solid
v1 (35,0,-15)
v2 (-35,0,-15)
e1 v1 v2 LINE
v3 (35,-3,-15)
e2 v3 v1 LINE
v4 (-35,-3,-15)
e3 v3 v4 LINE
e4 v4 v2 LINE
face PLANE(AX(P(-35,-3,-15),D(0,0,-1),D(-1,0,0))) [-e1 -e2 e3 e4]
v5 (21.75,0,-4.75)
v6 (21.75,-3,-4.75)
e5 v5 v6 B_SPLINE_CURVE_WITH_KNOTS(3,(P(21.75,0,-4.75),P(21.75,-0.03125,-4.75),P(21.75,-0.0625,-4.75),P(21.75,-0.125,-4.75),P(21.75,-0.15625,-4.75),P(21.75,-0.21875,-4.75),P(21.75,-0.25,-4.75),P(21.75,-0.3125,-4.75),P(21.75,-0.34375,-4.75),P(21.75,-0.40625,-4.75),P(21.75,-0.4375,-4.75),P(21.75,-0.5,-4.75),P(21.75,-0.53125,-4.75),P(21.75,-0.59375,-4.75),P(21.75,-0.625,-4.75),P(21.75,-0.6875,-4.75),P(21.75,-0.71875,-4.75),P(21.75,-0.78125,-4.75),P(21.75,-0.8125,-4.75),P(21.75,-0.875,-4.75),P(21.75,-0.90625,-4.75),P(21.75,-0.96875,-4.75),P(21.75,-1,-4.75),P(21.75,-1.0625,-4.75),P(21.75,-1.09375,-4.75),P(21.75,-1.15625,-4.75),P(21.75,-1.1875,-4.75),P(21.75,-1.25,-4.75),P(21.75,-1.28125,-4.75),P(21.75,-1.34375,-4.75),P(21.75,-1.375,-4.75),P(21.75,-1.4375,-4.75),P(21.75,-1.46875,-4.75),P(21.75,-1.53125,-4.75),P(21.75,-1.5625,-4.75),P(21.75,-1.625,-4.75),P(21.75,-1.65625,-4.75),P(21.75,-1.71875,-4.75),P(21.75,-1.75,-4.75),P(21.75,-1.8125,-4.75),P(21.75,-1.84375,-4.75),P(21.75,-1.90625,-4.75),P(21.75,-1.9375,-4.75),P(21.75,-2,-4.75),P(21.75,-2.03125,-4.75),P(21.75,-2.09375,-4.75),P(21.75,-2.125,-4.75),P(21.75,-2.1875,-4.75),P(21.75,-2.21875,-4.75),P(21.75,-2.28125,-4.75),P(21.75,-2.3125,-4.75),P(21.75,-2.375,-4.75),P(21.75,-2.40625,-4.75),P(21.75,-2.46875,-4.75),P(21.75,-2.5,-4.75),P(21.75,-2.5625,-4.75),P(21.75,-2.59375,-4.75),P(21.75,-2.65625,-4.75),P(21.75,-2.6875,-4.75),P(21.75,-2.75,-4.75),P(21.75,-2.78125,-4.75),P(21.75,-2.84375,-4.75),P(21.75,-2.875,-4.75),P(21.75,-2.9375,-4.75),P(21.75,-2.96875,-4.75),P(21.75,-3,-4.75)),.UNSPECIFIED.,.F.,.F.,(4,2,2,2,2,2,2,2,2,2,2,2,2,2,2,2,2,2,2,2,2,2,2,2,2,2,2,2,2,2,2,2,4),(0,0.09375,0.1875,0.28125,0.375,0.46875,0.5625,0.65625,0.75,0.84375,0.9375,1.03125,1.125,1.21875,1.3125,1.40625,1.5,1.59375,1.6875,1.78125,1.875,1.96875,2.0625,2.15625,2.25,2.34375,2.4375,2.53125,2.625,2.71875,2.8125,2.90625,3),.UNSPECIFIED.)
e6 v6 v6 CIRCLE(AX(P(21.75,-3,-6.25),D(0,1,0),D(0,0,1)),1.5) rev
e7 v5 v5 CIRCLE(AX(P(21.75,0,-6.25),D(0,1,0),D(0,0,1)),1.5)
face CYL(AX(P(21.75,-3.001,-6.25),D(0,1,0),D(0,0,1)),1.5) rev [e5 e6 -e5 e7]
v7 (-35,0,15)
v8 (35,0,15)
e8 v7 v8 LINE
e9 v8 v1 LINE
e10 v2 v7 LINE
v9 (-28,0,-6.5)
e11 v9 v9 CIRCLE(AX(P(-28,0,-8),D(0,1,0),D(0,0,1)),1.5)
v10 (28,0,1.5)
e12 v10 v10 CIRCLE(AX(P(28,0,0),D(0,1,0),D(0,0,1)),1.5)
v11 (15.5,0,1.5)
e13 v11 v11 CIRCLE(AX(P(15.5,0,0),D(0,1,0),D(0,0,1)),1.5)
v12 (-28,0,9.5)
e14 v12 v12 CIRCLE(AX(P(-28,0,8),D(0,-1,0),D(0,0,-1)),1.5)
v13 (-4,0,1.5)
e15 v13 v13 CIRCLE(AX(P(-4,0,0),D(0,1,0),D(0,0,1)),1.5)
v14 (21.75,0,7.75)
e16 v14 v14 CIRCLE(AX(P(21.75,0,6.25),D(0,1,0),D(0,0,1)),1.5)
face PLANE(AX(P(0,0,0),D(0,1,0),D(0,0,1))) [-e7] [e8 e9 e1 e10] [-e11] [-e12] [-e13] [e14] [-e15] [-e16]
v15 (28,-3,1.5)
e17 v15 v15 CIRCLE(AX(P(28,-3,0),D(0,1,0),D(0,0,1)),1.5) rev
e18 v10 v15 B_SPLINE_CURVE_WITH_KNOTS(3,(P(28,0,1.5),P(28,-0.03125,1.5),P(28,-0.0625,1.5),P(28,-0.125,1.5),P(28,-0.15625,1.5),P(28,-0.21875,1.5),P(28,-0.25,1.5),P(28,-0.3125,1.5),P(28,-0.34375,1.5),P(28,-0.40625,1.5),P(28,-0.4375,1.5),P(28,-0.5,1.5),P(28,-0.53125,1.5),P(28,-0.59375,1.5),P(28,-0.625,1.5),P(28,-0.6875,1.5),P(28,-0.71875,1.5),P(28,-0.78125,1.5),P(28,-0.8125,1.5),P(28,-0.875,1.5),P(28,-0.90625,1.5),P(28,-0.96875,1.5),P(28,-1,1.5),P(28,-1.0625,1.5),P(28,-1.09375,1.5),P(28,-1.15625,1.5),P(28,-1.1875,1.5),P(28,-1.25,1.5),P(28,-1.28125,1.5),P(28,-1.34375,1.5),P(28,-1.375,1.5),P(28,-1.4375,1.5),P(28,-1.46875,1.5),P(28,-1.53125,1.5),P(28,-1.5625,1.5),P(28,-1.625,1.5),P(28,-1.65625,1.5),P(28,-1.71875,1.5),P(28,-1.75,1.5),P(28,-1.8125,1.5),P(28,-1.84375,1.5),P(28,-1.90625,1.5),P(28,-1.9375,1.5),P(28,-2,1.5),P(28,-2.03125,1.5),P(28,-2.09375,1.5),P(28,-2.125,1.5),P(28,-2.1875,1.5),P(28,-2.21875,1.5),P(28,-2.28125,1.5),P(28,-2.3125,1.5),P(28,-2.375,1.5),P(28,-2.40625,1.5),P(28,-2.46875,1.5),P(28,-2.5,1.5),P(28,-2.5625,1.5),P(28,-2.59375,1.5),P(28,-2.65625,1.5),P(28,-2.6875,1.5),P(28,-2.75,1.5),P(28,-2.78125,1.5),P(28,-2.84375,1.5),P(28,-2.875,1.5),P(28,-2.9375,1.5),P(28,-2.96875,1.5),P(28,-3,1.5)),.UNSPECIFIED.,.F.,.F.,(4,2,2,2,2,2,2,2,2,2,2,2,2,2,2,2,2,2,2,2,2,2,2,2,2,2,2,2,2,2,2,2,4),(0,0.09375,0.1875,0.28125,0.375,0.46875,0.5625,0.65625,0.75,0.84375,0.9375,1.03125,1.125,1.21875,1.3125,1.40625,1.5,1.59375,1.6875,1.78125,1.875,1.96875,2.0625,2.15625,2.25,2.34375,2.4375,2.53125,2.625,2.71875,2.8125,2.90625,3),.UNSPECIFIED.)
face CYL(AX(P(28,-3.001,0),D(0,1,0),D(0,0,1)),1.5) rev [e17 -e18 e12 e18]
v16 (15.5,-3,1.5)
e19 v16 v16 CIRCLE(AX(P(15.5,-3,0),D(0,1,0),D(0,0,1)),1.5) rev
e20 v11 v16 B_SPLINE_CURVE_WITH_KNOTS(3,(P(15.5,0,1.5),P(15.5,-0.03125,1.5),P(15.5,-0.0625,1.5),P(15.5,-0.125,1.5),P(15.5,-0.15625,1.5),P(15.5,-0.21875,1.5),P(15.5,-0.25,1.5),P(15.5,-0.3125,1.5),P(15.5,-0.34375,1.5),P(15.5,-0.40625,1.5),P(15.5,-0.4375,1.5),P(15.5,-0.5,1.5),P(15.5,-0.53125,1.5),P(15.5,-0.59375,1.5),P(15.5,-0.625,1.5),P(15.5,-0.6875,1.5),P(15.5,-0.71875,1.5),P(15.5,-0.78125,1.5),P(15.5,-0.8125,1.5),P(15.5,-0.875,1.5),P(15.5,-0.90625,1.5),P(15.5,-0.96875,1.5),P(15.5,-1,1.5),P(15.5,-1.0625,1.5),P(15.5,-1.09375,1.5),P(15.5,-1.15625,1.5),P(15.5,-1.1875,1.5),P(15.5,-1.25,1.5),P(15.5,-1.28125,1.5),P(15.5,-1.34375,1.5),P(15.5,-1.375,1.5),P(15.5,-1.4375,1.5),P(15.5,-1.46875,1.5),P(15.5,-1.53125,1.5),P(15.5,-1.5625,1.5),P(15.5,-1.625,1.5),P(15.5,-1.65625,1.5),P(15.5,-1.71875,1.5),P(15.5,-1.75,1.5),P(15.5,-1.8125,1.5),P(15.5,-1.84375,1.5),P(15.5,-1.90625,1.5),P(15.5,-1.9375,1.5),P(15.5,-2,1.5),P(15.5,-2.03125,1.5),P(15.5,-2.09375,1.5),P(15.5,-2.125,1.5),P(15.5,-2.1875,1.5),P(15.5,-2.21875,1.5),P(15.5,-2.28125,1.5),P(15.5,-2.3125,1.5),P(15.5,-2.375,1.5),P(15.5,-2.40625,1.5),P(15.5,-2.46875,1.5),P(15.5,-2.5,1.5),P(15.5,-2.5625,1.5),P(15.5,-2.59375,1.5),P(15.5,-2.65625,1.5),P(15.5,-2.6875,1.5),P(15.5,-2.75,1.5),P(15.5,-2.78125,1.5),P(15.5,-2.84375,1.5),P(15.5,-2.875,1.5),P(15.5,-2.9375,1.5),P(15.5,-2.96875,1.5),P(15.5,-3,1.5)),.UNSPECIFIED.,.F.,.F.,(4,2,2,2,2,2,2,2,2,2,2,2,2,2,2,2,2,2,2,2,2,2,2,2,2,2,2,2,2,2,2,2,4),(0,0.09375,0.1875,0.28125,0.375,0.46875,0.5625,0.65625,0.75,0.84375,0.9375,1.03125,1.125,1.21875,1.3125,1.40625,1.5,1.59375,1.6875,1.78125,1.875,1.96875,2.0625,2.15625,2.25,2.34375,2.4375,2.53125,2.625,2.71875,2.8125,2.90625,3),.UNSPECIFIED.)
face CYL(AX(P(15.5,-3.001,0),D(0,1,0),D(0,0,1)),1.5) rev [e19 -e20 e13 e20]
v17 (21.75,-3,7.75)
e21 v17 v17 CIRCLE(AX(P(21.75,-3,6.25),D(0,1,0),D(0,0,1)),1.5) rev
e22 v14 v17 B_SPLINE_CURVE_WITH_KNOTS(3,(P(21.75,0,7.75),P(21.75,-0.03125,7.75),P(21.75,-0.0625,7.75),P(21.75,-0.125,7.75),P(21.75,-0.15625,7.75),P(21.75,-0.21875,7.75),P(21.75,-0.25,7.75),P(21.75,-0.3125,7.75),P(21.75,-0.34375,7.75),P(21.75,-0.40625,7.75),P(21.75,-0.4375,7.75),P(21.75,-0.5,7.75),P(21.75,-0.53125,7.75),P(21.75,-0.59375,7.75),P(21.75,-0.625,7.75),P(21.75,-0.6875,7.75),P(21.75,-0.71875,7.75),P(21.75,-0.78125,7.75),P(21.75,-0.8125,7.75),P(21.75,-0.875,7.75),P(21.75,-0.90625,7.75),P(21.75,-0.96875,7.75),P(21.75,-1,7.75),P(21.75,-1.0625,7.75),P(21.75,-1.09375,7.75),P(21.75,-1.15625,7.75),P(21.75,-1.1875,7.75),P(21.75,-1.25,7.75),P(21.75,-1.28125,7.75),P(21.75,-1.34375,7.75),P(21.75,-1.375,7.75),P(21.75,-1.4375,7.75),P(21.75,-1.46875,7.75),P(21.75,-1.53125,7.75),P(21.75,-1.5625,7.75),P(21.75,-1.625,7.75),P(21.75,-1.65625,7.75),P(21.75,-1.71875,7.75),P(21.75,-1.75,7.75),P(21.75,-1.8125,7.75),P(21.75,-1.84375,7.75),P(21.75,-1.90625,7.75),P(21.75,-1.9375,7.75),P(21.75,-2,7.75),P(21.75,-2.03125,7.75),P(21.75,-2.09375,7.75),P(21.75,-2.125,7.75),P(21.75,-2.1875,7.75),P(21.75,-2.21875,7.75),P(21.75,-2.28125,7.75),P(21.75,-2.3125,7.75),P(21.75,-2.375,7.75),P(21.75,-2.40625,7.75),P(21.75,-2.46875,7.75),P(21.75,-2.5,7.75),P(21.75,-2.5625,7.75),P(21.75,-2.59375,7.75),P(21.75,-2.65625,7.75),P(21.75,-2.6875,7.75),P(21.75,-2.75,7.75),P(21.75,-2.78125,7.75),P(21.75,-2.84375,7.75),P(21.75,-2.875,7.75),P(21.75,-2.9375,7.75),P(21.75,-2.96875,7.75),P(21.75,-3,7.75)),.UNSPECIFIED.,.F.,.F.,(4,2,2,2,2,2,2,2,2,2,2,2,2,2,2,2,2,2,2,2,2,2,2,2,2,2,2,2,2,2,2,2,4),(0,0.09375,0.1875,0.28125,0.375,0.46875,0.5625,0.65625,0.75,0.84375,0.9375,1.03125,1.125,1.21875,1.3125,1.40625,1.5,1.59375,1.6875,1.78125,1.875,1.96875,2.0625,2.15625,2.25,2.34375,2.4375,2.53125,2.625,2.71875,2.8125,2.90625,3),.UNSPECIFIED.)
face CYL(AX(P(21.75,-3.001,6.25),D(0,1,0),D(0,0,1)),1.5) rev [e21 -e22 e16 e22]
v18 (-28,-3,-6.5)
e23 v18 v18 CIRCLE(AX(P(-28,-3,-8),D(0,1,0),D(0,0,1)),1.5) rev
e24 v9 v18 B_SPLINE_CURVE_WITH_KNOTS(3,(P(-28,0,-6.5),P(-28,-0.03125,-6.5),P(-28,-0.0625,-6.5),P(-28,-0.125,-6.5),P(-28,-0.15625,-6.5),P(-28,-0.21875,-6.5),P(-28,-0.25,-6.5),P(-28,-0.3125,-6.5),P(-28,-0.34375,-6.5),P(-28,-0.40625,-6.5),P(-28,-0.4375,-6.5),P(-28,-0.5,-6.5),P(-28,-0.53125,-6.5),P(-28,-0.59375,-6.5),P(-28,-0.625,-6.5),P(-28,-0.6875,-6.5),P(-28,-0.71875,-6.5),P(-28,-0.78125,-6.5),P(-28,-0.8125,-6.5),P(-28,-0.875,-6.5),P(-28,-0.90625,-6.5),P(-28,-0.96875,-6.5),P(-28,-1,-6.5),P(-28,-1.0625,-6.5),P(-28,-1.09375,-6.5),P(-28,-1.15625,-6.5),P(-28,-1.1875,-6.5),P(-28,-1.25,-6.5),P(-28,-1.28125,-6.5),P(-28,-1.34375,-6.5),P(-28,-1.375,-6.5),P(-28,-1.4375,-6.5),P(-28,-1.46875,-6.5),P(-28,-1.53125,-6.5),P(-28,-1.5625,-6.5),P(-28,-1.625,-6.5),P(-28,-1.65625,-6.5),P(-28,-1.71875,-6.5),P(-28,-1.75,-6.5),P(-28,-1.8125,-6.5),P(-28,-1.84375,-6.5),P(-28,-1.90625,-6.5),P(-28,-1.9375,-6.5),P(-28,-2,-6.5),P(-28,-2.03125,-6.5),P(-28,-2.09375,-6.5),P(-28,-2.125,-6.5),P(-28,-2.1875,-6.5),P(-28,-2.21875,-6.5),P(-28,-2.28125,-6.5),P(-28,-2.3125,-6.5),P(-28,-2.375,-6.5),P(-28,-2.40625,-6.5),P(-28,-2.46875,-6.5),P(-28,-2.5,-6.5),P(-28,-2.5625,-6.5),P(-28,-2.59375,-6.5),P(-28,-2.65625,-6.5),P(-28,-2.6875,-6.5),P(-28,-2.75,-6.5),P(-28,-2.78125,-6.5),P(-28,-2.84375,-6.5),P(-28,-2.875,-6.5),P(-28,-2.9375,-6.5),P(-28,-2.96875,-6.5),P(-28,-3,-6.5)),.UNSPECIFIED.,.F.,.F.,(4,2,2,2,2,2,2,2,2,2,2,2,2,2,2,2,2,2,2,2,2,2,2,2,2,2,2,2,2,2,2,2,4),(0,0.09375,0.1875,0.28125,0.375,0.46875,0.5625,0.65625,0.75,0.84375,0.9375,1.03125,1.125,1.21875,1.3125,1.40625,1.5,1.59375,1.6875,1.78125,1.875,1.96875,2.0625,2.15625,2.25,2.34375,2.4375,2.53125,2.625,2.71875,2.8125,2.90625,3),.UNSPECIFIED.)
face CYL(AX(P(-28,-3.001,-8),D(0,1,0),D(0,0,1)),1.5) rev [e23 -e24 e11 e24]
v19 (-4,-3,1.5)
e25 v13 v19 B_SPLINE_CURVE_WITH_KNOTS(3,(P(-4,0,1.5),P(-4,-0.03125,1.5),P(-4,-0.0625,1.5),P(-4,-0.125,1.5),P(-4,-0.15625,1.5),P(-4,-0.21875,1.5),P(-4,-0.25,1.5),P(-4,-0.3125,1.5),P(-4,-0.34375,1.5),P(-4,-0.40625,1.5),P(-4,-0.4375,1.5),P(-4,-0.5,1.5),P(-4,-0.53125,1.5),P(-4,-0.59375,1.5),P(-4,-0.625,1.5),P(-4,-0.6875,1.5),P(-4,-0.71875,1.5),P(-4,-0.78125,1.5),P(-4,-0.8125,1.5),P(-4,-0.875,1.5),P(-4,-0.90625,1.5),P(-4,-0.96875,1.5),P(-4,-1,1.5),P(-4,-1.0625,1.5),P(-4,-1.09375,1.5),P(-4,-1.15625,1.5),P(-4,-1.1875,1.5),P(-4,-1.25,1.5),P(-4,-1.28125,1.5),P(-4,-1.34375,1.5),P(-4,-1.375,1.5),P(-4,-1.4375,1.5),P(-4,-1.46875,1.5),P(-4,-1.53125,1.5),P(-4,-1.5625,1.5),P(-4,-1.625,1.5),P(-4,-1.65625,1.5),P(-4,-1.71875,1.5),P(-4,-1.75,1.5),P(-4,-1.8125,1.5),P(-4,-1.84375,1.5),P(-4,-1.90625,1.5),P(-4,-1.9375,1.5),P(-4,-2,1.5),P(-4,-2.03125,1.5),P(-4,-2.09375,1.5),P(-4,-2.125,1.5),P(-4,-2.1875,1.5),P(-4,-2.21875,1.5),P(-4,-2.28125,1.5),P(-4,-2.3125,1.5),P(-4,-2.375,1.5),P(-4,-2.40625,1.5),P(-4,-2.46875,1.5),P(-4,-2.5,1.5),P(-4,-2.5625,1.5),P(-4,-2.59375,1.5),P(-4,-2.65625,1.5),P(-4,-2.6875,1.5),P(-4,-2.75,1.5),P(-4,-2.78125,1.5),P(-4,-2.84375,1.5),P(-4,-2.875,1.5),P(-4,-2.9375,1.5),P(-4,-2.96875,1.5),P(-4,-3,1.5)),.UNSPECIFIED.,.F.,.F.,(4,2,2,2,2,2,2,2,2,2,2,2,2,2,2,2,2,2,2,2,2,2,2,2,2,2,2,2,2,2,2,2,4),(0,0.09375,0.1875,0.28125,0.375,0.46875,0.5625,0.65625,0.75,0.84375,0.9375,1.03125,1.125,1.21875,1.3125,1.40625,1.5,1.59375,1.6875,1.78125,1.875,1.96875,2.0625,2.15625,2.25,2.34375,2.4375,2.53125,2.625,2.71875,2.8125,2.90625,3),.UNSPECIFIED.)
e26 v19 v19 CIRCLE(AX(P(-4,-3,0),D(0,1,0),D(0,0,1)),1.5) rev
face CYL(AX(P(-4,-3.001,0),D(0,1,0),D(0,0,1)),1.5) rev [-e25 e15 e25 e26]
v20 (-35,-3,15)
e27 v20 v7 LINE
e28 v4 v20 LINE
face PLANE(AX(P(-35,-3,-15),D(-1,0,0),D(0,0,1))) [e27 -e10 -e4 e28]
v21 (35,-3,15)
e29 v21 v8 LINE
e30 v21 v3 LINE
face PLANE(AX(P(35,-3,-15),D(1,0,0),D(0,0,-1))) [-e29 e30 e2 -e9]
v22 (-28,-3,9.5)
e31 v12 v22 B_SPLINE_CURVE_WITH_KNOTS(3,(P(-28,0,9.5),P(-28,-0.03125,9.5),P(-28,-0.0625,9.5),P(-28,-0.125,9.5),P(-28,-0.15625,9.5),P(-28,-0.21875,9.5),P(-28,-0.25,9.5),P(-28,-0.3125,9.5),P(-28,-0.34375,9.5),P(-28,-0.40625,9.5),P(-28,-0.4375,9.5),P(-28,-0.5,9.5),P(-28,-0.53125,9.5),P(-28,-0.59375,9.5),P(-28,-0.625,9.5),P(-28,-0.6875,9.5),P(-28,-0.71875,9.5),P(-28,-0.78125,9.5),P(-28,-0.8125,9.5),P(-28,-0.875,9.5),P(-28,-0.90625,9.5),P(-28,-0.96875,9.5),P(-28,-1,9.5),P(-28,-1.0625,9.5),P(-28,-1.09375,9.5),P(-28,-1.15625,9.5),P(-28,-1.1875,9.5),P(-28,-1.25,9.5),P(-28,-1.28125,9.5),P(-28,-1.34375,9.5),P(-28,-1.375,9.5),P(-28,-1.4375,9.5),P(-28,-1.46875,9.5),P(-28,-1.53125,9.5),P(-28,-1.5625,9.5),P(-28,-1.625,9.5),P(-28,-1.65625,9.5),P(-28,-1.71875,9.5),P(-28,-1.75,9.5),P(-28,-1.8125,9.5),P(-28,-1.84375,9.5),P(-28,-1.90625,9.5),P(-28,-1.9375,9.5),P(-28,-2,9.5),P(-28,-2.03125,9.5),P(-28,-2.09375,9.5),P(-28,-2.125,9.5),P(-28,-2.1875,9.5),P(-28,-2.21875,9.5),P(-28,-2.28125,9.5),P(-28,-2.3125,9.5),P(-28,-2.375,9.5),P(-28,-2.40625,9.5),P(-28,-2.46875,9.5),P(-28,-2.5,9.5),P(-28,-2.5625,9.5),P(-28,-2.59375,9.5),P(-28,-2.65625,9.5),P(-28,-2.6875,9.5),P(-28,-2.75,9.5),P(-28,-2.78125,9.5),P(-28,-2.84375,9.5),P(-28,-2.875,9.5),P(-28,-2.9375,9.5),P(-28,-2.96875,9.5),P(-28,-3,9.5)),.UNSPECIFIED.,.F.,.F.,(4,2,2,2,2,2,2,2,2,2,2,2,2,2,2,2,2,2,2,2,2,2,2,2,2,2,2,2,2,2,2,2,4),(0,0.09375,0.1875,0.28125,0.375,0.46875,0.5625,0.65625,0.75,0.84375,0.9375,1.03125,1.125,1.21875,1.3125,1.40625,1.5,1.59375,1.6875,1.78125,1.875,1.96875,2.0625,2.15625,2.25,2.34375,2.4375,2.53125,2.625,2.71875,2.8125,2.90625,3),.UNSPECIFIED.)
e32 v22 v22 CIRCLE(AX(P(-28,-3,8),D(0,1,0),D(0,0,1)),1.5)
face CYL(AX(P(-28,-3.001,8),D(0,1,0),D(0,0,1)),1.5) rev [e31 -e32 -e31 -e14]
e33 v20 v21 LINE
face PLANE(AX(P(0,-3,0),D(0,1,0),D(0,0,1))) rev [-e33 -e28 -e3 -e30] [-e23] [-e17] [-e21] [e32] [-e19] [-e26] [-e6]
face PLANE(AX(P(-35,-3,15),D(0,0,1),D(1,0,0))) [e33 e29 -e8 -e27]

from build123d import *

# Parameters (mm, degrees)
SZKIC1_W                   = 70
SZKIC1_H                   = 30
ODGI_CIE_BAZOWE1_DEPTH     = 3
WYTNIJ_WYCI_GNI_CIE1_REACH = 40.197
SZKIC6_R                   = 1.5
WYTNIJ_WYCI_GNI_CIE2_REACH = 40.197
SZKIC7_R                   = 1.5
WYTNIJ_WYCI_GNI_CIE3_REACH = 40.197
SZKIC10_R                  = 1.5


# Sheet-metal steps are written as plain solids
with BuildPart() as part:
    # Szkic1 → Odgięcie bazowe1 (new body)
    with BuildSketch(Plane(origin=(0, 0, 0), x_dir=(1, 0, 0), z_dir=(0, 1, 0))):
        Rectangle(SZKIC1_W, SZKIC1_H)
    extrude(amount=-ODGI_CIE_BAZOWE1_DEPTH)

    # Szkic6 → Wytnij-wyciągnięcie1 (cut, up to next)
    with BuildSketch(Plane(origin=(0, 0, 0), x_dir=(1, 0, 0), z_dir=(0, 1, 0)), mode=Mode.PRIVATE) as wytnij_wyci_gni_cie1_sk1:
        with Locations(Location((-28, 8, 0), (0, 0, 270))):
            Circle(SZKIC6_R)
    wytnij_wyci_gni_cie1_tool1 = extrude(wytnij_wyci_gni_cie1_sk1.sketch, amount=-WYTNIJ_WYCI_GNI_CIE1_REACH, mode=Mode.PRIVATE) & part.part
    wytnij_wyci_gni_cie1 = wytnij_wyci_gni_cie1_tool1.solids().sort_by_distance((-28, 0, -8))[0]
    add(wytnij_wyci_gni_cie1, mode=Mode.SUBTRACT)

    # Lustro1: Wytnij-wyciągnięcie1 across plane
    add(wytnij_wyci_gni_cie1.mirror(Plane.XY), mode=Mode.SUBTRACT)

    # Szkic7 → Wytnij-wyciągnięcie2 (cut, up to next)
    with BuildSketch(Plane(origin=(0, 0, 0), x_dir=(1, 0, 0), z_dir=(0, 1, 0)), mode=Mode.PRIVATE) as wytnij_wyci_gni_cie2_sk1:
        with Locations(Location((28, 0, 0), (0, 0, 270))):
            Circle(SZKIC7_R)
    wytnij_wyci_gni_cie2_tool1 = extrude(wytnij_wyci_gni_cie2_sk1.sketch, amount=-WYTNIJ_WYCI_GNI_CIE2_REACH, mode=Mode.PRIVATE) & part.part
    wytnij_wyci_gni_cie2 = wytnij_wyci_gni_cie2_tool1.solids().sort_by_distance((28, 0, 0))[0]
    add(wytnij_wyci_gni_cie2, mode=Mode.SUBTRACT)

    # Szkic-szyk1: Wytnij-wyciągnięcie2 at 3 more places
    with Locations((-12.5, 0, 0), (-6.25, 0, -6.25), (-6.25, 0, 6.25)):
        add(wytnij_wyci_gni_cie2, mode=Mode.SUBTRACT)

    # Szkic10 → Wytnij-wyciągnięcie3 (cut, up to next)
    with BuildSketch(Plane(origin=(0, 0, 0), x_dir=(1, 0, 0), z_dir=(0, 1, 0)), mode=Mode.PRIVATE) as wytnij_wyci_gni_cie3_sk1:
        with Locations(Location((-4, 0, 0), (0, 0, 270))):
            Circle(SZKIC10_R)
    wytnij_wyci_gni_cie3_tool1 = extrude(wytnij_wyci_gni_cie3_sk1.sketch, amount=-WYTNIJ_WYCI_GNI_CIE3_REACH, mode=Mode.PRIVATE) & part.part
    add(wytnij_wyci_gni_cie3_tool1.solids().sort_by_distance((-4, 0, 0))[0], mode=Mode.SUBTRACT)


solid = part.part
